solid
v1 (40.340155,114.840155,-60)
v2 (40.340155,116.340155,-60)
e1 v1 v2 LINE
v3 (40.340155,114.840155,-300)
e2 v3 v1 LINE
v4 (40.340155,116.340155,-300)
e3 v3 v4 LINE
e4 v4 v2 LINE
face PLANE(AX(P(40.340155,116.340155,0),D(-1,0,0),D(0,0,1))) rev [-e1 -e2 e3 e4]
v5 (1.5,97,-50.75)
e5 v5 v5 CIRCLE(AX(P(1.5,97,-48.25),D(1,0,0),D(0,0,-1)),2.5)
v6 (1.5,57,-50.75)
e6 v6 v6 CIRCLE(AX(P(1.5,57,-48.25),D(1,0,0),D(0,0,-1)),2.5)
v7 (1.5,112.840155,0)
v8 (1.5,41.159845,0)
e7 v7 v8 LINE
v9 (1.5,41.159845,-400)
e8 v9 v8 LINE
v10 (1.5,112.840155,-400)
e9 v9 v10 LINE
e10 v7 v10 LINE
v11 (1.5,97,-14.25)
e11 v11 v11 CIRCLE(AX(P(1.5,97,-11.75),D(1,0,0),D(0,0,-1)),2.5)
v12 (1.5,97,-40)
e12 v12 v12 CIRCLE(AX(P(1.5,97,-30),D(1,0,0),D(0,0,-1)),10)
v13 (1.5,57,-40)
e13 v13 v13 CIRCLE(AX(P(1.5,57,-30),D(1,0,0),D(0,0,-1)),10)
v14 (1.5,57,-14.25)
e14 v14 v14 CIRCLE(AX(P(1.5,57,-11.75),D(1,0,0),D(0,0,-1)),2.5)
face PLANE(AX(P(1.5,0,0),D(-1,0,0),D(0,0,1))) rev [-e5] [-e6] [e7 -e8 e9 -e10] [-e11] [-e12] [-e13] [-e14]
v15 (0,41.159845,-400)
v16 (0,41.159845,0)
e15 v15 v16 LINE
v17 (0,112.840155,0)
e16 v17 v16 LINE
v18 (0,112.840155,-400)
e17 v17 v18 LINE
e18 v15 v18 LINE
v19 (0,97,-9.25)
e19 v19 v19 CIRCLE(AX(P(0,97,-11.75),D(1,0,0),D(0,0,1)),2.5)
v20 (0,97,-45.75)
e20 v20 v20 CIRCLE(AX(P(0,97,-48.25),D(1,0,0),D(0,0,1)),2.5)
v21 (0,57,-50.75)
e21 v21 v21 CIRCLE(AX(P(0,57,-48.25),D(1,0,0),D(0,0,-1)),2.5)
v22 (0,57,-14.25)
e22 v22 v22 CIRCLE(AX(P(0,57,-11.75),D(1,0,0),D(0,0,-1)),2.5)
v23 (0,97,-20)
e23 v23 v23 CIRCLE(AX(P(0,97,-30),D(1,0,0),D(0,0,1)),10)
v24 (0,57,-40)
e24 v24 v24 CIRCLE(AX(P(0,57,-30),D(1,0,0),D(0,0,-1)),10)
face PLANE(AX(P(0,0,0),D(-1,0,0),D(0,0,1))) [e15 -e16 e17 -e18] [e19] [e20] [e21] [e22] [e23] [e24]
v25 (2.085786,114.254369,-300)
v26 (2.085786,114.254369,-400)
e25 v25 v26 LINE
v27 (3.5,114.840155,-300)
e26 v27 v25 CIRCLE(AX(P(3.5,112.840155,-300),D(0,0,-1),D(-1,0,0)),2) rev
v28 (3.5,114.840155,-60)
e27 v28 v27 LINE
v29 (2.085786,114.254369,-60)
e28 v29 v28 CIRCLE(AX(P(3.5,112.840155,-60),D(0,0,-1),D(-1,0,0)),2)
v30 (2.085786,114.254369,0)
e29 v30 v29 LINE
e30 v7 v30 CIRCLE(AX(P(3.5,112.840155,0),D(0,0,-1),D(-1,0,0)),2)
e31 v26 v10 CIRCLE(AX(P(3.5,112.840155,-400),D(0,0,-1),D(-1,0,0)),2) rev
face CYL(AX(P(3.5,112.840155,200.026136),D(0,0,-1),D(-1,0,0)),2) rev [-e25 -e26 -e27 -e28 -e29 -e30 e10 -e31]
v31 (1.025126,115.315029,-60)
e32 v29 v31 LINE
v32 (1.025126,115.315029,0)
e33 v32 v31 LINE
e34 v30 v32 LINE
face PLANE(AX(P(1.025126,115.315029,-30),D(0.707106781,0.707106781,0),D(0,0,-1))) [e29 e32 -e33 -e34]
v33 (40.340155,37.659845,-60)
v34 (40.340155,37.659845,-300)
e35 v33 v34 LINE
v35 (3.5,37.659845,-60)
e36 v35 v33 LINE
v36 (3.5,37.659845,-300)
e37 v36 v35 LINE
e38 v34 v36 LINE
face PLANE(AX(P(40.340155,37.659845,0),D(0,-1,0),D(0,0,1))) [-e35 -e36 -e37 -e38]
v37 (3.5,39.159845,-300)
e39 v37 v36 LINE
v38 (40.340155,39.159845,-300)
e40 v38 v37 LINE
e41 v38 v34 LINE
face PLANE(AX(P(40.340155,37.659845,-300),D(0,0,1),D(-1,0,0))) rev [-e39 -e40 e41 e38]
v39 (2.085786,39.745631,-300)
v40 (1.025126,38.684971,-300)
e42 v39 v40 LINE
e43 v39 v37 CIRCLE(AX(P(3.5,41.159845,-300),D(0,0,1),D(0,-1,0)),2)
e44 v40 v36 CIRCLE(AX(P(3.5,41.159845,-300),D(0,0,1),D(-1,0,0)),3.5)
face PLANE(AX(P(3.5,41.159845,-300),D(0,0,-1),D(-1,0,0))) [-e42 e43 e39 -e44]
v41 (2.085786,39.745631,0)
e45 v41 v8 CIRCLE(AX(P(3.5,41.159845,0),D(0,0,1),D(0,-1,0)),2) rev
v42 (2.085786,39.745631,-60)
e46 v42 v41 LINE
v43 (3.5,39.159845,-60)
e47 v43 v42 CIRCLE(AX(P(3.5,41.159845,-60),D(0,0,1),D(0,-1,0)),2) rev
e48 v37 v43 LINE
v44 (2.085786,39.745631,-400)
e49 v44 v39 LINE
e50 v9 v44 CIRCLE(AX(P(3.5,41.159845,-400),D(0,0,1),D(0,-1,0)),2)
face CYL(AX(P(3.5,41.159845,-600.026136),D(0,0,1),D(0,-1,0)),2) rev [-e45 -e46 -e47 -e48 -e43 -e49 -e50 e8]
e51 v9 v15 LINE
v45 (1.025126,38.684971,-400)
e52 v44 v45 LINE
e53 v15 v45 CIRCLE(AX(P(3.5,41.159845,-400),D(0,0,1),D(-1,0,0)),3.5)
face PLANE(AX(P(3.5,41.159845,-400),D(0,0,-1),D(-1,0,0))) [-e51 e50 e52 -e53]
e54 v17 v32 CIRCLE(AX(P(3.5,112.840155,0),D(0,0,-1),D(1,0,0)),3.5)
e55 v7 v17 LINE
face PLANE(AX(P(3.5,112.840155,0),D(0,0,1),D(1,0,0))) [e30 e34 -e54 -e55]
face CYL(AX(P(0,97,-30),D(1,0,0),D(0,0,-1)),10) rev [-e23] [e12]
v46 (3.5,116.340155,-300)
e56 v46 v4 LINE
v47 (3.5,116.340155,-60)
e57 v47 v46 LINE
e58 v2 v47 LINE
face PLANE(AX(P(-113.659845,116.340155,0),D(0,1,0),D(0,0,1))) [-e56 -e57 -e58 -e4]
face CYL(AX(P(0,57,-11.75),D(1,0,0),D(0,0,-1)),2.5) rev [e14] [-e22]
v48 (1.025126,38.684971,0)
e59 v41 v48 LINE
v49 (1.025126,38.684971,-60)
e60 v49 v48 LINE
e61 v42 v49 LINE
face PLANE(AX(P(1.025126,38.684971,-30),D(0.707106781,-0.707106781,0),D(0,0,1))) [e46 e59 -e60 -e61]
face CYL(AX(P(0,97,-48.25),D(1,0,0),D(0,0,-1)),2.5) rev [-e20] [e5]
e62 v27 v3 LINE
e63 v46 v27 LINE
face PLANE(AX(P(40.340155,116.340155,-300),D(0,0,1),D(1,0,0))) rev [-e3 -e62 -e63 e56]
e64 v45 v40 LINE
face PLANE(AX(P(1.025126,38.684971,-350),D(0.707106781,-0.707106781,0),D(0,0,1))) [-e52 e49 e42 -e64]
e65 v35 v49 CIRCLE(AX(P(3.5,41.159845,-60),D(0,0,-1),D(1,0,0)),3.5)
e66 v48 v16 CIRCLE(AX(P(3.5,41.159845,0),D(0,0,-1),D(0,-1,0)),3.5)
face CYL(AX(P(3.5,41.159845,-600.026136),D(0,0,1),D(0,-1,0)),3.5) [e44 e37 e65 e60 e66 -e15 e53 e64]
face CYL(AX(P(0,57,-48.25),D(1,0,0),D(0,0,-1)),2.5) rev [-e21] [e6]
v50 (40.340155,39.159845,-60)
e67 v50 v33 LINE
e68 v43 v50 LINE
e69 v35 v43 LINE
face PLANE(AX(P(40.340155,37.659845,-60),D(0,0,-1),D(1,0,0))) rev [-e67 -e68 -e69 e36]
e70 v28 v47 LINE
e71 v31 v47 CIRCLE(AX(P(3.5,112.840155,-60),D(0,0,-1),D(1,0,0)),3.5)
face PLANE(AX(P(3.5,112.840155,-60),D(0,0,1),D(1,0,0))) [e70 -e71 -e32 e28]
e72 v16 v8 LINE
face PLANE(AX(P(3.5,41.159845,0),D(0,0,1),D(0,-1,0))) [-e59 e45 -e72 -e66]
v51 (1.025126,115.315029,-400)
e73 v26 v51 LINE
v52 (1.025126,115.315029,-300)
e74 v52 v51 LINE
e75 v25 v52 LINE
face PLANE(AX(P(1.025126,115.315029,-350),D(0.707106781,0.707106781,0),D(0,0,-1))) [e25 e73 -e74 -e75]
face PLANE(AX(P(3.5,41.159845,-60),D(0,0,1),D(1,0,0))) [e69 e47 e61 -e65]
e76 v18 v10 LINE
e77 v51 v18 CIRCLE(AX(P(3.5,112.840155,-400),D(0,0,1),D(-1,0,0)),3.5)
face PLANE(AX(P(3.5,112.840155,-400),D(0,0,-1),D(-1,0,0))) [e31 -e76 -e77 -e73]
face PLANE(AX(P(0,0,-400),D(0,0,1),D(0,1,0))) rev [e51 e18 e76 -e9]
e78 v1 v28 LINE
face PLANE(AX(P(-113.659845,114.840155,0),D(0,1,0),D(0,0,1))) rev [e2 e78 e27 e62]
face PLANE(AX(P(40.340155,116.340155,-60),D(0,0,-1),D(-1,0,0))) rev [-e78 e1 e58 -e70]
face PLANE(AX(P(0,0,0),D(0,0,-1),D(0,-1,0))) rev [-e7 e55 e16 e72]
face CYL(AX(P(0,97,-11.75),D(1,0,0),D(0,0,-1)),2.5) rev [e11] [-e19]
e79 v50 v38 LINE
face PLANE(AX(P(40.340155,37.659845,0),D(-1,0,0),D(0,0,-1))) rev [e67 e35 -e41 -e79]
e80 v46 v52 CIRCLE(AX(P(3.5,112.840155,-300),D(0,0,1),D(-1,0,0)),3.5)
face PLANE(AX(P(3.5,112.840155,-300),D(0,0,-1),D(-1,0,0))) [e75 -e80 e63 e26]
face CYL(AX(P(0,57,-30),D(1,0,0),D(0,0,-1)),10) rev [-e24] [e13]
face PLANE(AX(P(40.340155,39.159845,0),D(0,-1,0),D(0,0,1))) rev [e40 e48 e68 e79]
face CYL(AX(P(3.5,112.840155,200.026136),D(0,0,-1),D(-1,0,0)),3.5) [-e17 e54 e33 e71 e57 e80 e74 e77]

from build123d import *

# Parameters (mm, degrees)
ESBO_O3_W                = 400
ESBO_O3_H                = 154
RESSALTO_EXTRUS_O1_DEPTH = 1.5
ESBO_O10_W               = 60
ESBO_O10_H               = 39
ESBO_O10_W_2             = 100
CORTE_EXTRUS_O1_DEPTH    = 429.623669435
ESBO_O11_R               = 10
ESBO_O11_R_2             = 2.5
CORTE_EXTRUS_O2_DEPTH    = 429.623669435
DOBRA_START              = -400
DOBRA_ESBO_ADA1_DEPTH    = 400
DOBRA_ESBO_ADA1_2_DEPTH  = 100
DOBRA_START_2            = -60
DOBRA_ESBO_ADA1_3_DEPTH  = 60
DOBRA_START_3            = -300
DOBRA_ESBO_ADA1_4_DEPTH  = 240
DOBRA_ESBO_ADA1_5_DEPTH  = 400
DOBRA_ESBO_ADA2_DEPTH    = 400
DOBRA_ESBO_ADA2_2_DEPTH  = 100
DOBRA_ESBO_ADA2_3_DEPTH  = 60
DOBRA_ESBO_ADA2_4_DEPTH  = 240
DOBRA_ESBO_ADA2_5_DEPTH  = 400


# Read off the part's stored shape, not the designer's step: Transforma__o de esbo_o2, Dobra esbo_ada2
with BuildPart() as part:
    # Esboço3 → Ressalto-extrusão1 (new body)
    with BuildSketch(Plane(origin=(0, 0, 0), x_dir=(0, 0, -1), z_dir=(1, 0, 0))):
        with Locations((200, 77)):
            Rectangle(ESBO_O3_W, ESBO_O3_H)
    extrude(amount=RESSALTO_EXTRUS_O1_DEPTH)

    # Esboço10 → Corte-extrusão1 (cut, through all)
    with BuildSketch(Plane.ZY):
        with Locations((-30, 134.5)):
            Rectangle(ESBO_O10_W, ESBO_O10_H)
        with Locations((-350, 134.5)):
            Rectangle(ESBO_O10_W_2, ESBO_O10_H)
        with Locations((-350, 19.5)):
            Rectangle(ESBO_O10_W_2, ESBO_O10_H)
        with Locations((-30, 19.5)):
            Rectangle(ESBO_O10_W, ESBO_O10_H)
    extrude(amount=-CORTE_EXTRUS_O1_DEPTH, mode=Mode.SUBTRACT)

    # Esboço11 → Corte-extrusão2 (cut, through all)
    with BuildSketch(Plane(origin=(1.5, 0, 0), x_dir=(0, 0, -1), z_dir=(1, 0, 0))):
        with Locations((30, 57)):
            Circle(ESBO_O11_R)
        with Locations(Location((30, 97, 0), (0, 0, 180))):
            Circle(ESBO_O11_R)
        with Locations((11.75, 57)):
            Circle(ESBO_O11_R_2)
        with Locations((48.25, 57)):
            Circle(ESBO_O11_R_2)
        with Locations(Location((48.25, 97, 0), (0, 0, 180))):
            Circle(ESBO_O11_R_2)
        with Locations(Location((11.75, 97, 0), (0, 0, 180))):
            Circle(ESBO_O11_R_2)
    extrude(amount=-CORTE_EXTRUS_O2_DEPTH, mode=Mode.SUBTRACT)

    # Dobra esboçada1 outline → Dobra esboçada1 (cut)
    with BuildSketch(Plane.XY.offset(DOBRA_START)):
        with BuildLine():
            Line((1.5, 0), (1.5, 38.287563626))
            ThreePointArc((1.5, 38.287563626), (0.397581589, 39.539659775), (0, 41.159844949))
            Line((0, 41.159844949), (0, 0))
            Line((0, 0), (1.5, 0))
        make_face()
    extrude(amount=DOBRA_ESBO_ADA1_DEPTH, mode=Mode.SUBTRACT)

    # Dobra esbo_ada1 2 outline → Dobra esbo_ada1 2 (cut)
    with BuildSketch(Plane.XY.offset(DOBRA_START)):
        Polygon((1.5, 39), (1.5, 39.159844949), (1.340155051, 39), align=None)
    extrude(amount=DOBRA_ESBO_ADA1_2_DEPTH, mode=Mode.SUBTRACT)

    # Dobra esbo_ada1 3 outline → Dobra esbo_ada1 3 (cut)
    with BuildSketch(Plane.XY.offset(DOBRA_START_2)):
        Polygon((1.5, 39), (1.5, 39.159844949), (1.340155051, 39), align=None)
    extrude(amount=DOBRA_ESBO_ADA1_3_DEPTH, mode=Mode.SUBTRACT)

    # Dobra esbo_ada1 4 outline → Dobra esbo_ada1 4 (add)
    with BuildSketch(Plane.XY.offset(DOBRA_START_3)):
        with BuildLine():
            Line((40.340155051, 39.159844949), (3.5, 39.159844949))
            ThreePointArc((3.5, 39.159844949), (2.085786438, 39.745631387), (1.5, 41.159844949))
            Line((1.5, 41.159844949), (1.5, 38.287563626))
            ThreePointArc((1.5, 38.287563626), (2.451902827, 37.820459929), (3.5, 37.659844949))
            Line((3.5, 37.659844949), (40.340155051, 37.659844949))
            Line((40.340155051, 37.659844949), (40.340155051, 39.159844949))
        make_face()
    extrude(amount=DOBRA_ESBO_ADA1_4_DEPTH)

    # Dobra esbo_ada1 5 outline → Dobra esbo_ada1 5 (add)
    with BuildSketch(Plane.XY.offset(DOBRA_START)):
        with BuildLine():
            Line((1.5, 39.159844949), (2.085786438, 39.745631387))
            ThreePointArc((2.085786438, 39.745631387), (1.652240935, 40.394478084), (1.5, 41.159844949))
            Line((1.5, 41.159844949), (1.5, 39.159844949))
        make_face()
        with BuildLine():
            Line((1.025126266, 38.684971215), (1.340155051, 39))
            Line((1.340155051, 39), (0.745899458, 39))
            ThreePointArc((0.745899458, 39), (0.880772294, 38.838283789), (1.025126266, 38.684971215))
        make_face()
    extrude(amount=DOBRA_ESBO_ADA1_5_DEPTH)

    # Dobra esboçada2 outline → Dobra esboçada2 (cut)
    with BuildSketch(Plane.XY.offset(DOBRA_START)):
        with BuildLine():
            Line((1.5, 115.712436374), (1.5, 154))
            Line((1.5, 154), (0, 154))
            Line((0, 154), (0, 112.840155051))
            ThreePointArc((0, 112.840155051), (0.397581589, 114.460340225), (1.5, 115.712436374))
        make_face()
    extrude(amount=DOBRA_ESBO_ADA2_DEPTH, mode=Mode.SUBTRACT)

    # Dobra esbo_ada2 2 outline → Dobra esbo_ada2 2 (cut)
    with BuildSketch(Plane.XY.offset(DOBRA_START)):
        Polygon((1.5, 114.840155051), (1.5, 115), (1.340155051, 115), align=None)
    extrude(amount=DOBRA_ESBO_ADA2_2_DEPTH, mode=Mode.SUBTRACT)

    # Dobra esbo_ada2 3 outline → Dobra esbo_ada2 3 (cut)
    with BuildSketch(Plane.XY.offset(DOBRA_START_2)):
        Polygon((1.5, 114.840155051), (1.5, 115), (1.340155051, 115), align=None)
    extrude(amount=DOBRA_ESBO_ADA2_3_DEPTH, mode=Mode.SUBTRACT)

    # Dobra esbo_ada2 4 outline → Dobra esbo_ada2 4 (add)
    with BuildSketch(Plane.XY.offset(DOBRA_START_3)):
        with BuildLine():
            Line((40.340155051, 114.840155051), (40.340155051, 116.340155051))
            Line((40.340155051, 116.340155051), (3.5, 116.340155051))
            ThreePointArc((3.5, 116.340155051), (2.451902827, 116.179540071), (1.5, 115.712436374))
            Line((1.5, 115.712436374), (1.5, 112.840155051))
            ThreePointArc((1.5, 112.840155051), (2.085786438, 114.254368613), (3.5, 114.840155051))
            Line((3.5, 114.840155051), (40.340155051, 114.840155051))
        make_face()
    extrude(amount=DOBRA_ESBO_ADA2_4_DEPTH)

    # Dobra esbo_ada2 5 outline → Dobra esbo_ada2 5 (add)
    with BuildSketch(Plane.XY.offset(DOBRA_START)):
        with BuildLine():
            ThreePointArc((1.5, 112.840155051), (1.652240935, 113.605521916), (2.085786438, 114.254368613))
            Line((2.085786438, 114.254368613), (1.5, 114.840155051))
            Line((1.5, 114.840155051), (1.5, 112.840155051))
        make_face()
        with BuildLine():
            Line((1.340155051, 115), (1.025126266, 115.315028785))
            ThreePointArc((1.025126266, 115.315028785), (0.880772294, 115.161716211), (0.745899458, 115))
            Line((0.745899458, 115), (1.340155051, 115))
        make_face()
    extrude(amount=DOBRA_ESBO_ADA2_5_DEPTH)


solid = part.part
